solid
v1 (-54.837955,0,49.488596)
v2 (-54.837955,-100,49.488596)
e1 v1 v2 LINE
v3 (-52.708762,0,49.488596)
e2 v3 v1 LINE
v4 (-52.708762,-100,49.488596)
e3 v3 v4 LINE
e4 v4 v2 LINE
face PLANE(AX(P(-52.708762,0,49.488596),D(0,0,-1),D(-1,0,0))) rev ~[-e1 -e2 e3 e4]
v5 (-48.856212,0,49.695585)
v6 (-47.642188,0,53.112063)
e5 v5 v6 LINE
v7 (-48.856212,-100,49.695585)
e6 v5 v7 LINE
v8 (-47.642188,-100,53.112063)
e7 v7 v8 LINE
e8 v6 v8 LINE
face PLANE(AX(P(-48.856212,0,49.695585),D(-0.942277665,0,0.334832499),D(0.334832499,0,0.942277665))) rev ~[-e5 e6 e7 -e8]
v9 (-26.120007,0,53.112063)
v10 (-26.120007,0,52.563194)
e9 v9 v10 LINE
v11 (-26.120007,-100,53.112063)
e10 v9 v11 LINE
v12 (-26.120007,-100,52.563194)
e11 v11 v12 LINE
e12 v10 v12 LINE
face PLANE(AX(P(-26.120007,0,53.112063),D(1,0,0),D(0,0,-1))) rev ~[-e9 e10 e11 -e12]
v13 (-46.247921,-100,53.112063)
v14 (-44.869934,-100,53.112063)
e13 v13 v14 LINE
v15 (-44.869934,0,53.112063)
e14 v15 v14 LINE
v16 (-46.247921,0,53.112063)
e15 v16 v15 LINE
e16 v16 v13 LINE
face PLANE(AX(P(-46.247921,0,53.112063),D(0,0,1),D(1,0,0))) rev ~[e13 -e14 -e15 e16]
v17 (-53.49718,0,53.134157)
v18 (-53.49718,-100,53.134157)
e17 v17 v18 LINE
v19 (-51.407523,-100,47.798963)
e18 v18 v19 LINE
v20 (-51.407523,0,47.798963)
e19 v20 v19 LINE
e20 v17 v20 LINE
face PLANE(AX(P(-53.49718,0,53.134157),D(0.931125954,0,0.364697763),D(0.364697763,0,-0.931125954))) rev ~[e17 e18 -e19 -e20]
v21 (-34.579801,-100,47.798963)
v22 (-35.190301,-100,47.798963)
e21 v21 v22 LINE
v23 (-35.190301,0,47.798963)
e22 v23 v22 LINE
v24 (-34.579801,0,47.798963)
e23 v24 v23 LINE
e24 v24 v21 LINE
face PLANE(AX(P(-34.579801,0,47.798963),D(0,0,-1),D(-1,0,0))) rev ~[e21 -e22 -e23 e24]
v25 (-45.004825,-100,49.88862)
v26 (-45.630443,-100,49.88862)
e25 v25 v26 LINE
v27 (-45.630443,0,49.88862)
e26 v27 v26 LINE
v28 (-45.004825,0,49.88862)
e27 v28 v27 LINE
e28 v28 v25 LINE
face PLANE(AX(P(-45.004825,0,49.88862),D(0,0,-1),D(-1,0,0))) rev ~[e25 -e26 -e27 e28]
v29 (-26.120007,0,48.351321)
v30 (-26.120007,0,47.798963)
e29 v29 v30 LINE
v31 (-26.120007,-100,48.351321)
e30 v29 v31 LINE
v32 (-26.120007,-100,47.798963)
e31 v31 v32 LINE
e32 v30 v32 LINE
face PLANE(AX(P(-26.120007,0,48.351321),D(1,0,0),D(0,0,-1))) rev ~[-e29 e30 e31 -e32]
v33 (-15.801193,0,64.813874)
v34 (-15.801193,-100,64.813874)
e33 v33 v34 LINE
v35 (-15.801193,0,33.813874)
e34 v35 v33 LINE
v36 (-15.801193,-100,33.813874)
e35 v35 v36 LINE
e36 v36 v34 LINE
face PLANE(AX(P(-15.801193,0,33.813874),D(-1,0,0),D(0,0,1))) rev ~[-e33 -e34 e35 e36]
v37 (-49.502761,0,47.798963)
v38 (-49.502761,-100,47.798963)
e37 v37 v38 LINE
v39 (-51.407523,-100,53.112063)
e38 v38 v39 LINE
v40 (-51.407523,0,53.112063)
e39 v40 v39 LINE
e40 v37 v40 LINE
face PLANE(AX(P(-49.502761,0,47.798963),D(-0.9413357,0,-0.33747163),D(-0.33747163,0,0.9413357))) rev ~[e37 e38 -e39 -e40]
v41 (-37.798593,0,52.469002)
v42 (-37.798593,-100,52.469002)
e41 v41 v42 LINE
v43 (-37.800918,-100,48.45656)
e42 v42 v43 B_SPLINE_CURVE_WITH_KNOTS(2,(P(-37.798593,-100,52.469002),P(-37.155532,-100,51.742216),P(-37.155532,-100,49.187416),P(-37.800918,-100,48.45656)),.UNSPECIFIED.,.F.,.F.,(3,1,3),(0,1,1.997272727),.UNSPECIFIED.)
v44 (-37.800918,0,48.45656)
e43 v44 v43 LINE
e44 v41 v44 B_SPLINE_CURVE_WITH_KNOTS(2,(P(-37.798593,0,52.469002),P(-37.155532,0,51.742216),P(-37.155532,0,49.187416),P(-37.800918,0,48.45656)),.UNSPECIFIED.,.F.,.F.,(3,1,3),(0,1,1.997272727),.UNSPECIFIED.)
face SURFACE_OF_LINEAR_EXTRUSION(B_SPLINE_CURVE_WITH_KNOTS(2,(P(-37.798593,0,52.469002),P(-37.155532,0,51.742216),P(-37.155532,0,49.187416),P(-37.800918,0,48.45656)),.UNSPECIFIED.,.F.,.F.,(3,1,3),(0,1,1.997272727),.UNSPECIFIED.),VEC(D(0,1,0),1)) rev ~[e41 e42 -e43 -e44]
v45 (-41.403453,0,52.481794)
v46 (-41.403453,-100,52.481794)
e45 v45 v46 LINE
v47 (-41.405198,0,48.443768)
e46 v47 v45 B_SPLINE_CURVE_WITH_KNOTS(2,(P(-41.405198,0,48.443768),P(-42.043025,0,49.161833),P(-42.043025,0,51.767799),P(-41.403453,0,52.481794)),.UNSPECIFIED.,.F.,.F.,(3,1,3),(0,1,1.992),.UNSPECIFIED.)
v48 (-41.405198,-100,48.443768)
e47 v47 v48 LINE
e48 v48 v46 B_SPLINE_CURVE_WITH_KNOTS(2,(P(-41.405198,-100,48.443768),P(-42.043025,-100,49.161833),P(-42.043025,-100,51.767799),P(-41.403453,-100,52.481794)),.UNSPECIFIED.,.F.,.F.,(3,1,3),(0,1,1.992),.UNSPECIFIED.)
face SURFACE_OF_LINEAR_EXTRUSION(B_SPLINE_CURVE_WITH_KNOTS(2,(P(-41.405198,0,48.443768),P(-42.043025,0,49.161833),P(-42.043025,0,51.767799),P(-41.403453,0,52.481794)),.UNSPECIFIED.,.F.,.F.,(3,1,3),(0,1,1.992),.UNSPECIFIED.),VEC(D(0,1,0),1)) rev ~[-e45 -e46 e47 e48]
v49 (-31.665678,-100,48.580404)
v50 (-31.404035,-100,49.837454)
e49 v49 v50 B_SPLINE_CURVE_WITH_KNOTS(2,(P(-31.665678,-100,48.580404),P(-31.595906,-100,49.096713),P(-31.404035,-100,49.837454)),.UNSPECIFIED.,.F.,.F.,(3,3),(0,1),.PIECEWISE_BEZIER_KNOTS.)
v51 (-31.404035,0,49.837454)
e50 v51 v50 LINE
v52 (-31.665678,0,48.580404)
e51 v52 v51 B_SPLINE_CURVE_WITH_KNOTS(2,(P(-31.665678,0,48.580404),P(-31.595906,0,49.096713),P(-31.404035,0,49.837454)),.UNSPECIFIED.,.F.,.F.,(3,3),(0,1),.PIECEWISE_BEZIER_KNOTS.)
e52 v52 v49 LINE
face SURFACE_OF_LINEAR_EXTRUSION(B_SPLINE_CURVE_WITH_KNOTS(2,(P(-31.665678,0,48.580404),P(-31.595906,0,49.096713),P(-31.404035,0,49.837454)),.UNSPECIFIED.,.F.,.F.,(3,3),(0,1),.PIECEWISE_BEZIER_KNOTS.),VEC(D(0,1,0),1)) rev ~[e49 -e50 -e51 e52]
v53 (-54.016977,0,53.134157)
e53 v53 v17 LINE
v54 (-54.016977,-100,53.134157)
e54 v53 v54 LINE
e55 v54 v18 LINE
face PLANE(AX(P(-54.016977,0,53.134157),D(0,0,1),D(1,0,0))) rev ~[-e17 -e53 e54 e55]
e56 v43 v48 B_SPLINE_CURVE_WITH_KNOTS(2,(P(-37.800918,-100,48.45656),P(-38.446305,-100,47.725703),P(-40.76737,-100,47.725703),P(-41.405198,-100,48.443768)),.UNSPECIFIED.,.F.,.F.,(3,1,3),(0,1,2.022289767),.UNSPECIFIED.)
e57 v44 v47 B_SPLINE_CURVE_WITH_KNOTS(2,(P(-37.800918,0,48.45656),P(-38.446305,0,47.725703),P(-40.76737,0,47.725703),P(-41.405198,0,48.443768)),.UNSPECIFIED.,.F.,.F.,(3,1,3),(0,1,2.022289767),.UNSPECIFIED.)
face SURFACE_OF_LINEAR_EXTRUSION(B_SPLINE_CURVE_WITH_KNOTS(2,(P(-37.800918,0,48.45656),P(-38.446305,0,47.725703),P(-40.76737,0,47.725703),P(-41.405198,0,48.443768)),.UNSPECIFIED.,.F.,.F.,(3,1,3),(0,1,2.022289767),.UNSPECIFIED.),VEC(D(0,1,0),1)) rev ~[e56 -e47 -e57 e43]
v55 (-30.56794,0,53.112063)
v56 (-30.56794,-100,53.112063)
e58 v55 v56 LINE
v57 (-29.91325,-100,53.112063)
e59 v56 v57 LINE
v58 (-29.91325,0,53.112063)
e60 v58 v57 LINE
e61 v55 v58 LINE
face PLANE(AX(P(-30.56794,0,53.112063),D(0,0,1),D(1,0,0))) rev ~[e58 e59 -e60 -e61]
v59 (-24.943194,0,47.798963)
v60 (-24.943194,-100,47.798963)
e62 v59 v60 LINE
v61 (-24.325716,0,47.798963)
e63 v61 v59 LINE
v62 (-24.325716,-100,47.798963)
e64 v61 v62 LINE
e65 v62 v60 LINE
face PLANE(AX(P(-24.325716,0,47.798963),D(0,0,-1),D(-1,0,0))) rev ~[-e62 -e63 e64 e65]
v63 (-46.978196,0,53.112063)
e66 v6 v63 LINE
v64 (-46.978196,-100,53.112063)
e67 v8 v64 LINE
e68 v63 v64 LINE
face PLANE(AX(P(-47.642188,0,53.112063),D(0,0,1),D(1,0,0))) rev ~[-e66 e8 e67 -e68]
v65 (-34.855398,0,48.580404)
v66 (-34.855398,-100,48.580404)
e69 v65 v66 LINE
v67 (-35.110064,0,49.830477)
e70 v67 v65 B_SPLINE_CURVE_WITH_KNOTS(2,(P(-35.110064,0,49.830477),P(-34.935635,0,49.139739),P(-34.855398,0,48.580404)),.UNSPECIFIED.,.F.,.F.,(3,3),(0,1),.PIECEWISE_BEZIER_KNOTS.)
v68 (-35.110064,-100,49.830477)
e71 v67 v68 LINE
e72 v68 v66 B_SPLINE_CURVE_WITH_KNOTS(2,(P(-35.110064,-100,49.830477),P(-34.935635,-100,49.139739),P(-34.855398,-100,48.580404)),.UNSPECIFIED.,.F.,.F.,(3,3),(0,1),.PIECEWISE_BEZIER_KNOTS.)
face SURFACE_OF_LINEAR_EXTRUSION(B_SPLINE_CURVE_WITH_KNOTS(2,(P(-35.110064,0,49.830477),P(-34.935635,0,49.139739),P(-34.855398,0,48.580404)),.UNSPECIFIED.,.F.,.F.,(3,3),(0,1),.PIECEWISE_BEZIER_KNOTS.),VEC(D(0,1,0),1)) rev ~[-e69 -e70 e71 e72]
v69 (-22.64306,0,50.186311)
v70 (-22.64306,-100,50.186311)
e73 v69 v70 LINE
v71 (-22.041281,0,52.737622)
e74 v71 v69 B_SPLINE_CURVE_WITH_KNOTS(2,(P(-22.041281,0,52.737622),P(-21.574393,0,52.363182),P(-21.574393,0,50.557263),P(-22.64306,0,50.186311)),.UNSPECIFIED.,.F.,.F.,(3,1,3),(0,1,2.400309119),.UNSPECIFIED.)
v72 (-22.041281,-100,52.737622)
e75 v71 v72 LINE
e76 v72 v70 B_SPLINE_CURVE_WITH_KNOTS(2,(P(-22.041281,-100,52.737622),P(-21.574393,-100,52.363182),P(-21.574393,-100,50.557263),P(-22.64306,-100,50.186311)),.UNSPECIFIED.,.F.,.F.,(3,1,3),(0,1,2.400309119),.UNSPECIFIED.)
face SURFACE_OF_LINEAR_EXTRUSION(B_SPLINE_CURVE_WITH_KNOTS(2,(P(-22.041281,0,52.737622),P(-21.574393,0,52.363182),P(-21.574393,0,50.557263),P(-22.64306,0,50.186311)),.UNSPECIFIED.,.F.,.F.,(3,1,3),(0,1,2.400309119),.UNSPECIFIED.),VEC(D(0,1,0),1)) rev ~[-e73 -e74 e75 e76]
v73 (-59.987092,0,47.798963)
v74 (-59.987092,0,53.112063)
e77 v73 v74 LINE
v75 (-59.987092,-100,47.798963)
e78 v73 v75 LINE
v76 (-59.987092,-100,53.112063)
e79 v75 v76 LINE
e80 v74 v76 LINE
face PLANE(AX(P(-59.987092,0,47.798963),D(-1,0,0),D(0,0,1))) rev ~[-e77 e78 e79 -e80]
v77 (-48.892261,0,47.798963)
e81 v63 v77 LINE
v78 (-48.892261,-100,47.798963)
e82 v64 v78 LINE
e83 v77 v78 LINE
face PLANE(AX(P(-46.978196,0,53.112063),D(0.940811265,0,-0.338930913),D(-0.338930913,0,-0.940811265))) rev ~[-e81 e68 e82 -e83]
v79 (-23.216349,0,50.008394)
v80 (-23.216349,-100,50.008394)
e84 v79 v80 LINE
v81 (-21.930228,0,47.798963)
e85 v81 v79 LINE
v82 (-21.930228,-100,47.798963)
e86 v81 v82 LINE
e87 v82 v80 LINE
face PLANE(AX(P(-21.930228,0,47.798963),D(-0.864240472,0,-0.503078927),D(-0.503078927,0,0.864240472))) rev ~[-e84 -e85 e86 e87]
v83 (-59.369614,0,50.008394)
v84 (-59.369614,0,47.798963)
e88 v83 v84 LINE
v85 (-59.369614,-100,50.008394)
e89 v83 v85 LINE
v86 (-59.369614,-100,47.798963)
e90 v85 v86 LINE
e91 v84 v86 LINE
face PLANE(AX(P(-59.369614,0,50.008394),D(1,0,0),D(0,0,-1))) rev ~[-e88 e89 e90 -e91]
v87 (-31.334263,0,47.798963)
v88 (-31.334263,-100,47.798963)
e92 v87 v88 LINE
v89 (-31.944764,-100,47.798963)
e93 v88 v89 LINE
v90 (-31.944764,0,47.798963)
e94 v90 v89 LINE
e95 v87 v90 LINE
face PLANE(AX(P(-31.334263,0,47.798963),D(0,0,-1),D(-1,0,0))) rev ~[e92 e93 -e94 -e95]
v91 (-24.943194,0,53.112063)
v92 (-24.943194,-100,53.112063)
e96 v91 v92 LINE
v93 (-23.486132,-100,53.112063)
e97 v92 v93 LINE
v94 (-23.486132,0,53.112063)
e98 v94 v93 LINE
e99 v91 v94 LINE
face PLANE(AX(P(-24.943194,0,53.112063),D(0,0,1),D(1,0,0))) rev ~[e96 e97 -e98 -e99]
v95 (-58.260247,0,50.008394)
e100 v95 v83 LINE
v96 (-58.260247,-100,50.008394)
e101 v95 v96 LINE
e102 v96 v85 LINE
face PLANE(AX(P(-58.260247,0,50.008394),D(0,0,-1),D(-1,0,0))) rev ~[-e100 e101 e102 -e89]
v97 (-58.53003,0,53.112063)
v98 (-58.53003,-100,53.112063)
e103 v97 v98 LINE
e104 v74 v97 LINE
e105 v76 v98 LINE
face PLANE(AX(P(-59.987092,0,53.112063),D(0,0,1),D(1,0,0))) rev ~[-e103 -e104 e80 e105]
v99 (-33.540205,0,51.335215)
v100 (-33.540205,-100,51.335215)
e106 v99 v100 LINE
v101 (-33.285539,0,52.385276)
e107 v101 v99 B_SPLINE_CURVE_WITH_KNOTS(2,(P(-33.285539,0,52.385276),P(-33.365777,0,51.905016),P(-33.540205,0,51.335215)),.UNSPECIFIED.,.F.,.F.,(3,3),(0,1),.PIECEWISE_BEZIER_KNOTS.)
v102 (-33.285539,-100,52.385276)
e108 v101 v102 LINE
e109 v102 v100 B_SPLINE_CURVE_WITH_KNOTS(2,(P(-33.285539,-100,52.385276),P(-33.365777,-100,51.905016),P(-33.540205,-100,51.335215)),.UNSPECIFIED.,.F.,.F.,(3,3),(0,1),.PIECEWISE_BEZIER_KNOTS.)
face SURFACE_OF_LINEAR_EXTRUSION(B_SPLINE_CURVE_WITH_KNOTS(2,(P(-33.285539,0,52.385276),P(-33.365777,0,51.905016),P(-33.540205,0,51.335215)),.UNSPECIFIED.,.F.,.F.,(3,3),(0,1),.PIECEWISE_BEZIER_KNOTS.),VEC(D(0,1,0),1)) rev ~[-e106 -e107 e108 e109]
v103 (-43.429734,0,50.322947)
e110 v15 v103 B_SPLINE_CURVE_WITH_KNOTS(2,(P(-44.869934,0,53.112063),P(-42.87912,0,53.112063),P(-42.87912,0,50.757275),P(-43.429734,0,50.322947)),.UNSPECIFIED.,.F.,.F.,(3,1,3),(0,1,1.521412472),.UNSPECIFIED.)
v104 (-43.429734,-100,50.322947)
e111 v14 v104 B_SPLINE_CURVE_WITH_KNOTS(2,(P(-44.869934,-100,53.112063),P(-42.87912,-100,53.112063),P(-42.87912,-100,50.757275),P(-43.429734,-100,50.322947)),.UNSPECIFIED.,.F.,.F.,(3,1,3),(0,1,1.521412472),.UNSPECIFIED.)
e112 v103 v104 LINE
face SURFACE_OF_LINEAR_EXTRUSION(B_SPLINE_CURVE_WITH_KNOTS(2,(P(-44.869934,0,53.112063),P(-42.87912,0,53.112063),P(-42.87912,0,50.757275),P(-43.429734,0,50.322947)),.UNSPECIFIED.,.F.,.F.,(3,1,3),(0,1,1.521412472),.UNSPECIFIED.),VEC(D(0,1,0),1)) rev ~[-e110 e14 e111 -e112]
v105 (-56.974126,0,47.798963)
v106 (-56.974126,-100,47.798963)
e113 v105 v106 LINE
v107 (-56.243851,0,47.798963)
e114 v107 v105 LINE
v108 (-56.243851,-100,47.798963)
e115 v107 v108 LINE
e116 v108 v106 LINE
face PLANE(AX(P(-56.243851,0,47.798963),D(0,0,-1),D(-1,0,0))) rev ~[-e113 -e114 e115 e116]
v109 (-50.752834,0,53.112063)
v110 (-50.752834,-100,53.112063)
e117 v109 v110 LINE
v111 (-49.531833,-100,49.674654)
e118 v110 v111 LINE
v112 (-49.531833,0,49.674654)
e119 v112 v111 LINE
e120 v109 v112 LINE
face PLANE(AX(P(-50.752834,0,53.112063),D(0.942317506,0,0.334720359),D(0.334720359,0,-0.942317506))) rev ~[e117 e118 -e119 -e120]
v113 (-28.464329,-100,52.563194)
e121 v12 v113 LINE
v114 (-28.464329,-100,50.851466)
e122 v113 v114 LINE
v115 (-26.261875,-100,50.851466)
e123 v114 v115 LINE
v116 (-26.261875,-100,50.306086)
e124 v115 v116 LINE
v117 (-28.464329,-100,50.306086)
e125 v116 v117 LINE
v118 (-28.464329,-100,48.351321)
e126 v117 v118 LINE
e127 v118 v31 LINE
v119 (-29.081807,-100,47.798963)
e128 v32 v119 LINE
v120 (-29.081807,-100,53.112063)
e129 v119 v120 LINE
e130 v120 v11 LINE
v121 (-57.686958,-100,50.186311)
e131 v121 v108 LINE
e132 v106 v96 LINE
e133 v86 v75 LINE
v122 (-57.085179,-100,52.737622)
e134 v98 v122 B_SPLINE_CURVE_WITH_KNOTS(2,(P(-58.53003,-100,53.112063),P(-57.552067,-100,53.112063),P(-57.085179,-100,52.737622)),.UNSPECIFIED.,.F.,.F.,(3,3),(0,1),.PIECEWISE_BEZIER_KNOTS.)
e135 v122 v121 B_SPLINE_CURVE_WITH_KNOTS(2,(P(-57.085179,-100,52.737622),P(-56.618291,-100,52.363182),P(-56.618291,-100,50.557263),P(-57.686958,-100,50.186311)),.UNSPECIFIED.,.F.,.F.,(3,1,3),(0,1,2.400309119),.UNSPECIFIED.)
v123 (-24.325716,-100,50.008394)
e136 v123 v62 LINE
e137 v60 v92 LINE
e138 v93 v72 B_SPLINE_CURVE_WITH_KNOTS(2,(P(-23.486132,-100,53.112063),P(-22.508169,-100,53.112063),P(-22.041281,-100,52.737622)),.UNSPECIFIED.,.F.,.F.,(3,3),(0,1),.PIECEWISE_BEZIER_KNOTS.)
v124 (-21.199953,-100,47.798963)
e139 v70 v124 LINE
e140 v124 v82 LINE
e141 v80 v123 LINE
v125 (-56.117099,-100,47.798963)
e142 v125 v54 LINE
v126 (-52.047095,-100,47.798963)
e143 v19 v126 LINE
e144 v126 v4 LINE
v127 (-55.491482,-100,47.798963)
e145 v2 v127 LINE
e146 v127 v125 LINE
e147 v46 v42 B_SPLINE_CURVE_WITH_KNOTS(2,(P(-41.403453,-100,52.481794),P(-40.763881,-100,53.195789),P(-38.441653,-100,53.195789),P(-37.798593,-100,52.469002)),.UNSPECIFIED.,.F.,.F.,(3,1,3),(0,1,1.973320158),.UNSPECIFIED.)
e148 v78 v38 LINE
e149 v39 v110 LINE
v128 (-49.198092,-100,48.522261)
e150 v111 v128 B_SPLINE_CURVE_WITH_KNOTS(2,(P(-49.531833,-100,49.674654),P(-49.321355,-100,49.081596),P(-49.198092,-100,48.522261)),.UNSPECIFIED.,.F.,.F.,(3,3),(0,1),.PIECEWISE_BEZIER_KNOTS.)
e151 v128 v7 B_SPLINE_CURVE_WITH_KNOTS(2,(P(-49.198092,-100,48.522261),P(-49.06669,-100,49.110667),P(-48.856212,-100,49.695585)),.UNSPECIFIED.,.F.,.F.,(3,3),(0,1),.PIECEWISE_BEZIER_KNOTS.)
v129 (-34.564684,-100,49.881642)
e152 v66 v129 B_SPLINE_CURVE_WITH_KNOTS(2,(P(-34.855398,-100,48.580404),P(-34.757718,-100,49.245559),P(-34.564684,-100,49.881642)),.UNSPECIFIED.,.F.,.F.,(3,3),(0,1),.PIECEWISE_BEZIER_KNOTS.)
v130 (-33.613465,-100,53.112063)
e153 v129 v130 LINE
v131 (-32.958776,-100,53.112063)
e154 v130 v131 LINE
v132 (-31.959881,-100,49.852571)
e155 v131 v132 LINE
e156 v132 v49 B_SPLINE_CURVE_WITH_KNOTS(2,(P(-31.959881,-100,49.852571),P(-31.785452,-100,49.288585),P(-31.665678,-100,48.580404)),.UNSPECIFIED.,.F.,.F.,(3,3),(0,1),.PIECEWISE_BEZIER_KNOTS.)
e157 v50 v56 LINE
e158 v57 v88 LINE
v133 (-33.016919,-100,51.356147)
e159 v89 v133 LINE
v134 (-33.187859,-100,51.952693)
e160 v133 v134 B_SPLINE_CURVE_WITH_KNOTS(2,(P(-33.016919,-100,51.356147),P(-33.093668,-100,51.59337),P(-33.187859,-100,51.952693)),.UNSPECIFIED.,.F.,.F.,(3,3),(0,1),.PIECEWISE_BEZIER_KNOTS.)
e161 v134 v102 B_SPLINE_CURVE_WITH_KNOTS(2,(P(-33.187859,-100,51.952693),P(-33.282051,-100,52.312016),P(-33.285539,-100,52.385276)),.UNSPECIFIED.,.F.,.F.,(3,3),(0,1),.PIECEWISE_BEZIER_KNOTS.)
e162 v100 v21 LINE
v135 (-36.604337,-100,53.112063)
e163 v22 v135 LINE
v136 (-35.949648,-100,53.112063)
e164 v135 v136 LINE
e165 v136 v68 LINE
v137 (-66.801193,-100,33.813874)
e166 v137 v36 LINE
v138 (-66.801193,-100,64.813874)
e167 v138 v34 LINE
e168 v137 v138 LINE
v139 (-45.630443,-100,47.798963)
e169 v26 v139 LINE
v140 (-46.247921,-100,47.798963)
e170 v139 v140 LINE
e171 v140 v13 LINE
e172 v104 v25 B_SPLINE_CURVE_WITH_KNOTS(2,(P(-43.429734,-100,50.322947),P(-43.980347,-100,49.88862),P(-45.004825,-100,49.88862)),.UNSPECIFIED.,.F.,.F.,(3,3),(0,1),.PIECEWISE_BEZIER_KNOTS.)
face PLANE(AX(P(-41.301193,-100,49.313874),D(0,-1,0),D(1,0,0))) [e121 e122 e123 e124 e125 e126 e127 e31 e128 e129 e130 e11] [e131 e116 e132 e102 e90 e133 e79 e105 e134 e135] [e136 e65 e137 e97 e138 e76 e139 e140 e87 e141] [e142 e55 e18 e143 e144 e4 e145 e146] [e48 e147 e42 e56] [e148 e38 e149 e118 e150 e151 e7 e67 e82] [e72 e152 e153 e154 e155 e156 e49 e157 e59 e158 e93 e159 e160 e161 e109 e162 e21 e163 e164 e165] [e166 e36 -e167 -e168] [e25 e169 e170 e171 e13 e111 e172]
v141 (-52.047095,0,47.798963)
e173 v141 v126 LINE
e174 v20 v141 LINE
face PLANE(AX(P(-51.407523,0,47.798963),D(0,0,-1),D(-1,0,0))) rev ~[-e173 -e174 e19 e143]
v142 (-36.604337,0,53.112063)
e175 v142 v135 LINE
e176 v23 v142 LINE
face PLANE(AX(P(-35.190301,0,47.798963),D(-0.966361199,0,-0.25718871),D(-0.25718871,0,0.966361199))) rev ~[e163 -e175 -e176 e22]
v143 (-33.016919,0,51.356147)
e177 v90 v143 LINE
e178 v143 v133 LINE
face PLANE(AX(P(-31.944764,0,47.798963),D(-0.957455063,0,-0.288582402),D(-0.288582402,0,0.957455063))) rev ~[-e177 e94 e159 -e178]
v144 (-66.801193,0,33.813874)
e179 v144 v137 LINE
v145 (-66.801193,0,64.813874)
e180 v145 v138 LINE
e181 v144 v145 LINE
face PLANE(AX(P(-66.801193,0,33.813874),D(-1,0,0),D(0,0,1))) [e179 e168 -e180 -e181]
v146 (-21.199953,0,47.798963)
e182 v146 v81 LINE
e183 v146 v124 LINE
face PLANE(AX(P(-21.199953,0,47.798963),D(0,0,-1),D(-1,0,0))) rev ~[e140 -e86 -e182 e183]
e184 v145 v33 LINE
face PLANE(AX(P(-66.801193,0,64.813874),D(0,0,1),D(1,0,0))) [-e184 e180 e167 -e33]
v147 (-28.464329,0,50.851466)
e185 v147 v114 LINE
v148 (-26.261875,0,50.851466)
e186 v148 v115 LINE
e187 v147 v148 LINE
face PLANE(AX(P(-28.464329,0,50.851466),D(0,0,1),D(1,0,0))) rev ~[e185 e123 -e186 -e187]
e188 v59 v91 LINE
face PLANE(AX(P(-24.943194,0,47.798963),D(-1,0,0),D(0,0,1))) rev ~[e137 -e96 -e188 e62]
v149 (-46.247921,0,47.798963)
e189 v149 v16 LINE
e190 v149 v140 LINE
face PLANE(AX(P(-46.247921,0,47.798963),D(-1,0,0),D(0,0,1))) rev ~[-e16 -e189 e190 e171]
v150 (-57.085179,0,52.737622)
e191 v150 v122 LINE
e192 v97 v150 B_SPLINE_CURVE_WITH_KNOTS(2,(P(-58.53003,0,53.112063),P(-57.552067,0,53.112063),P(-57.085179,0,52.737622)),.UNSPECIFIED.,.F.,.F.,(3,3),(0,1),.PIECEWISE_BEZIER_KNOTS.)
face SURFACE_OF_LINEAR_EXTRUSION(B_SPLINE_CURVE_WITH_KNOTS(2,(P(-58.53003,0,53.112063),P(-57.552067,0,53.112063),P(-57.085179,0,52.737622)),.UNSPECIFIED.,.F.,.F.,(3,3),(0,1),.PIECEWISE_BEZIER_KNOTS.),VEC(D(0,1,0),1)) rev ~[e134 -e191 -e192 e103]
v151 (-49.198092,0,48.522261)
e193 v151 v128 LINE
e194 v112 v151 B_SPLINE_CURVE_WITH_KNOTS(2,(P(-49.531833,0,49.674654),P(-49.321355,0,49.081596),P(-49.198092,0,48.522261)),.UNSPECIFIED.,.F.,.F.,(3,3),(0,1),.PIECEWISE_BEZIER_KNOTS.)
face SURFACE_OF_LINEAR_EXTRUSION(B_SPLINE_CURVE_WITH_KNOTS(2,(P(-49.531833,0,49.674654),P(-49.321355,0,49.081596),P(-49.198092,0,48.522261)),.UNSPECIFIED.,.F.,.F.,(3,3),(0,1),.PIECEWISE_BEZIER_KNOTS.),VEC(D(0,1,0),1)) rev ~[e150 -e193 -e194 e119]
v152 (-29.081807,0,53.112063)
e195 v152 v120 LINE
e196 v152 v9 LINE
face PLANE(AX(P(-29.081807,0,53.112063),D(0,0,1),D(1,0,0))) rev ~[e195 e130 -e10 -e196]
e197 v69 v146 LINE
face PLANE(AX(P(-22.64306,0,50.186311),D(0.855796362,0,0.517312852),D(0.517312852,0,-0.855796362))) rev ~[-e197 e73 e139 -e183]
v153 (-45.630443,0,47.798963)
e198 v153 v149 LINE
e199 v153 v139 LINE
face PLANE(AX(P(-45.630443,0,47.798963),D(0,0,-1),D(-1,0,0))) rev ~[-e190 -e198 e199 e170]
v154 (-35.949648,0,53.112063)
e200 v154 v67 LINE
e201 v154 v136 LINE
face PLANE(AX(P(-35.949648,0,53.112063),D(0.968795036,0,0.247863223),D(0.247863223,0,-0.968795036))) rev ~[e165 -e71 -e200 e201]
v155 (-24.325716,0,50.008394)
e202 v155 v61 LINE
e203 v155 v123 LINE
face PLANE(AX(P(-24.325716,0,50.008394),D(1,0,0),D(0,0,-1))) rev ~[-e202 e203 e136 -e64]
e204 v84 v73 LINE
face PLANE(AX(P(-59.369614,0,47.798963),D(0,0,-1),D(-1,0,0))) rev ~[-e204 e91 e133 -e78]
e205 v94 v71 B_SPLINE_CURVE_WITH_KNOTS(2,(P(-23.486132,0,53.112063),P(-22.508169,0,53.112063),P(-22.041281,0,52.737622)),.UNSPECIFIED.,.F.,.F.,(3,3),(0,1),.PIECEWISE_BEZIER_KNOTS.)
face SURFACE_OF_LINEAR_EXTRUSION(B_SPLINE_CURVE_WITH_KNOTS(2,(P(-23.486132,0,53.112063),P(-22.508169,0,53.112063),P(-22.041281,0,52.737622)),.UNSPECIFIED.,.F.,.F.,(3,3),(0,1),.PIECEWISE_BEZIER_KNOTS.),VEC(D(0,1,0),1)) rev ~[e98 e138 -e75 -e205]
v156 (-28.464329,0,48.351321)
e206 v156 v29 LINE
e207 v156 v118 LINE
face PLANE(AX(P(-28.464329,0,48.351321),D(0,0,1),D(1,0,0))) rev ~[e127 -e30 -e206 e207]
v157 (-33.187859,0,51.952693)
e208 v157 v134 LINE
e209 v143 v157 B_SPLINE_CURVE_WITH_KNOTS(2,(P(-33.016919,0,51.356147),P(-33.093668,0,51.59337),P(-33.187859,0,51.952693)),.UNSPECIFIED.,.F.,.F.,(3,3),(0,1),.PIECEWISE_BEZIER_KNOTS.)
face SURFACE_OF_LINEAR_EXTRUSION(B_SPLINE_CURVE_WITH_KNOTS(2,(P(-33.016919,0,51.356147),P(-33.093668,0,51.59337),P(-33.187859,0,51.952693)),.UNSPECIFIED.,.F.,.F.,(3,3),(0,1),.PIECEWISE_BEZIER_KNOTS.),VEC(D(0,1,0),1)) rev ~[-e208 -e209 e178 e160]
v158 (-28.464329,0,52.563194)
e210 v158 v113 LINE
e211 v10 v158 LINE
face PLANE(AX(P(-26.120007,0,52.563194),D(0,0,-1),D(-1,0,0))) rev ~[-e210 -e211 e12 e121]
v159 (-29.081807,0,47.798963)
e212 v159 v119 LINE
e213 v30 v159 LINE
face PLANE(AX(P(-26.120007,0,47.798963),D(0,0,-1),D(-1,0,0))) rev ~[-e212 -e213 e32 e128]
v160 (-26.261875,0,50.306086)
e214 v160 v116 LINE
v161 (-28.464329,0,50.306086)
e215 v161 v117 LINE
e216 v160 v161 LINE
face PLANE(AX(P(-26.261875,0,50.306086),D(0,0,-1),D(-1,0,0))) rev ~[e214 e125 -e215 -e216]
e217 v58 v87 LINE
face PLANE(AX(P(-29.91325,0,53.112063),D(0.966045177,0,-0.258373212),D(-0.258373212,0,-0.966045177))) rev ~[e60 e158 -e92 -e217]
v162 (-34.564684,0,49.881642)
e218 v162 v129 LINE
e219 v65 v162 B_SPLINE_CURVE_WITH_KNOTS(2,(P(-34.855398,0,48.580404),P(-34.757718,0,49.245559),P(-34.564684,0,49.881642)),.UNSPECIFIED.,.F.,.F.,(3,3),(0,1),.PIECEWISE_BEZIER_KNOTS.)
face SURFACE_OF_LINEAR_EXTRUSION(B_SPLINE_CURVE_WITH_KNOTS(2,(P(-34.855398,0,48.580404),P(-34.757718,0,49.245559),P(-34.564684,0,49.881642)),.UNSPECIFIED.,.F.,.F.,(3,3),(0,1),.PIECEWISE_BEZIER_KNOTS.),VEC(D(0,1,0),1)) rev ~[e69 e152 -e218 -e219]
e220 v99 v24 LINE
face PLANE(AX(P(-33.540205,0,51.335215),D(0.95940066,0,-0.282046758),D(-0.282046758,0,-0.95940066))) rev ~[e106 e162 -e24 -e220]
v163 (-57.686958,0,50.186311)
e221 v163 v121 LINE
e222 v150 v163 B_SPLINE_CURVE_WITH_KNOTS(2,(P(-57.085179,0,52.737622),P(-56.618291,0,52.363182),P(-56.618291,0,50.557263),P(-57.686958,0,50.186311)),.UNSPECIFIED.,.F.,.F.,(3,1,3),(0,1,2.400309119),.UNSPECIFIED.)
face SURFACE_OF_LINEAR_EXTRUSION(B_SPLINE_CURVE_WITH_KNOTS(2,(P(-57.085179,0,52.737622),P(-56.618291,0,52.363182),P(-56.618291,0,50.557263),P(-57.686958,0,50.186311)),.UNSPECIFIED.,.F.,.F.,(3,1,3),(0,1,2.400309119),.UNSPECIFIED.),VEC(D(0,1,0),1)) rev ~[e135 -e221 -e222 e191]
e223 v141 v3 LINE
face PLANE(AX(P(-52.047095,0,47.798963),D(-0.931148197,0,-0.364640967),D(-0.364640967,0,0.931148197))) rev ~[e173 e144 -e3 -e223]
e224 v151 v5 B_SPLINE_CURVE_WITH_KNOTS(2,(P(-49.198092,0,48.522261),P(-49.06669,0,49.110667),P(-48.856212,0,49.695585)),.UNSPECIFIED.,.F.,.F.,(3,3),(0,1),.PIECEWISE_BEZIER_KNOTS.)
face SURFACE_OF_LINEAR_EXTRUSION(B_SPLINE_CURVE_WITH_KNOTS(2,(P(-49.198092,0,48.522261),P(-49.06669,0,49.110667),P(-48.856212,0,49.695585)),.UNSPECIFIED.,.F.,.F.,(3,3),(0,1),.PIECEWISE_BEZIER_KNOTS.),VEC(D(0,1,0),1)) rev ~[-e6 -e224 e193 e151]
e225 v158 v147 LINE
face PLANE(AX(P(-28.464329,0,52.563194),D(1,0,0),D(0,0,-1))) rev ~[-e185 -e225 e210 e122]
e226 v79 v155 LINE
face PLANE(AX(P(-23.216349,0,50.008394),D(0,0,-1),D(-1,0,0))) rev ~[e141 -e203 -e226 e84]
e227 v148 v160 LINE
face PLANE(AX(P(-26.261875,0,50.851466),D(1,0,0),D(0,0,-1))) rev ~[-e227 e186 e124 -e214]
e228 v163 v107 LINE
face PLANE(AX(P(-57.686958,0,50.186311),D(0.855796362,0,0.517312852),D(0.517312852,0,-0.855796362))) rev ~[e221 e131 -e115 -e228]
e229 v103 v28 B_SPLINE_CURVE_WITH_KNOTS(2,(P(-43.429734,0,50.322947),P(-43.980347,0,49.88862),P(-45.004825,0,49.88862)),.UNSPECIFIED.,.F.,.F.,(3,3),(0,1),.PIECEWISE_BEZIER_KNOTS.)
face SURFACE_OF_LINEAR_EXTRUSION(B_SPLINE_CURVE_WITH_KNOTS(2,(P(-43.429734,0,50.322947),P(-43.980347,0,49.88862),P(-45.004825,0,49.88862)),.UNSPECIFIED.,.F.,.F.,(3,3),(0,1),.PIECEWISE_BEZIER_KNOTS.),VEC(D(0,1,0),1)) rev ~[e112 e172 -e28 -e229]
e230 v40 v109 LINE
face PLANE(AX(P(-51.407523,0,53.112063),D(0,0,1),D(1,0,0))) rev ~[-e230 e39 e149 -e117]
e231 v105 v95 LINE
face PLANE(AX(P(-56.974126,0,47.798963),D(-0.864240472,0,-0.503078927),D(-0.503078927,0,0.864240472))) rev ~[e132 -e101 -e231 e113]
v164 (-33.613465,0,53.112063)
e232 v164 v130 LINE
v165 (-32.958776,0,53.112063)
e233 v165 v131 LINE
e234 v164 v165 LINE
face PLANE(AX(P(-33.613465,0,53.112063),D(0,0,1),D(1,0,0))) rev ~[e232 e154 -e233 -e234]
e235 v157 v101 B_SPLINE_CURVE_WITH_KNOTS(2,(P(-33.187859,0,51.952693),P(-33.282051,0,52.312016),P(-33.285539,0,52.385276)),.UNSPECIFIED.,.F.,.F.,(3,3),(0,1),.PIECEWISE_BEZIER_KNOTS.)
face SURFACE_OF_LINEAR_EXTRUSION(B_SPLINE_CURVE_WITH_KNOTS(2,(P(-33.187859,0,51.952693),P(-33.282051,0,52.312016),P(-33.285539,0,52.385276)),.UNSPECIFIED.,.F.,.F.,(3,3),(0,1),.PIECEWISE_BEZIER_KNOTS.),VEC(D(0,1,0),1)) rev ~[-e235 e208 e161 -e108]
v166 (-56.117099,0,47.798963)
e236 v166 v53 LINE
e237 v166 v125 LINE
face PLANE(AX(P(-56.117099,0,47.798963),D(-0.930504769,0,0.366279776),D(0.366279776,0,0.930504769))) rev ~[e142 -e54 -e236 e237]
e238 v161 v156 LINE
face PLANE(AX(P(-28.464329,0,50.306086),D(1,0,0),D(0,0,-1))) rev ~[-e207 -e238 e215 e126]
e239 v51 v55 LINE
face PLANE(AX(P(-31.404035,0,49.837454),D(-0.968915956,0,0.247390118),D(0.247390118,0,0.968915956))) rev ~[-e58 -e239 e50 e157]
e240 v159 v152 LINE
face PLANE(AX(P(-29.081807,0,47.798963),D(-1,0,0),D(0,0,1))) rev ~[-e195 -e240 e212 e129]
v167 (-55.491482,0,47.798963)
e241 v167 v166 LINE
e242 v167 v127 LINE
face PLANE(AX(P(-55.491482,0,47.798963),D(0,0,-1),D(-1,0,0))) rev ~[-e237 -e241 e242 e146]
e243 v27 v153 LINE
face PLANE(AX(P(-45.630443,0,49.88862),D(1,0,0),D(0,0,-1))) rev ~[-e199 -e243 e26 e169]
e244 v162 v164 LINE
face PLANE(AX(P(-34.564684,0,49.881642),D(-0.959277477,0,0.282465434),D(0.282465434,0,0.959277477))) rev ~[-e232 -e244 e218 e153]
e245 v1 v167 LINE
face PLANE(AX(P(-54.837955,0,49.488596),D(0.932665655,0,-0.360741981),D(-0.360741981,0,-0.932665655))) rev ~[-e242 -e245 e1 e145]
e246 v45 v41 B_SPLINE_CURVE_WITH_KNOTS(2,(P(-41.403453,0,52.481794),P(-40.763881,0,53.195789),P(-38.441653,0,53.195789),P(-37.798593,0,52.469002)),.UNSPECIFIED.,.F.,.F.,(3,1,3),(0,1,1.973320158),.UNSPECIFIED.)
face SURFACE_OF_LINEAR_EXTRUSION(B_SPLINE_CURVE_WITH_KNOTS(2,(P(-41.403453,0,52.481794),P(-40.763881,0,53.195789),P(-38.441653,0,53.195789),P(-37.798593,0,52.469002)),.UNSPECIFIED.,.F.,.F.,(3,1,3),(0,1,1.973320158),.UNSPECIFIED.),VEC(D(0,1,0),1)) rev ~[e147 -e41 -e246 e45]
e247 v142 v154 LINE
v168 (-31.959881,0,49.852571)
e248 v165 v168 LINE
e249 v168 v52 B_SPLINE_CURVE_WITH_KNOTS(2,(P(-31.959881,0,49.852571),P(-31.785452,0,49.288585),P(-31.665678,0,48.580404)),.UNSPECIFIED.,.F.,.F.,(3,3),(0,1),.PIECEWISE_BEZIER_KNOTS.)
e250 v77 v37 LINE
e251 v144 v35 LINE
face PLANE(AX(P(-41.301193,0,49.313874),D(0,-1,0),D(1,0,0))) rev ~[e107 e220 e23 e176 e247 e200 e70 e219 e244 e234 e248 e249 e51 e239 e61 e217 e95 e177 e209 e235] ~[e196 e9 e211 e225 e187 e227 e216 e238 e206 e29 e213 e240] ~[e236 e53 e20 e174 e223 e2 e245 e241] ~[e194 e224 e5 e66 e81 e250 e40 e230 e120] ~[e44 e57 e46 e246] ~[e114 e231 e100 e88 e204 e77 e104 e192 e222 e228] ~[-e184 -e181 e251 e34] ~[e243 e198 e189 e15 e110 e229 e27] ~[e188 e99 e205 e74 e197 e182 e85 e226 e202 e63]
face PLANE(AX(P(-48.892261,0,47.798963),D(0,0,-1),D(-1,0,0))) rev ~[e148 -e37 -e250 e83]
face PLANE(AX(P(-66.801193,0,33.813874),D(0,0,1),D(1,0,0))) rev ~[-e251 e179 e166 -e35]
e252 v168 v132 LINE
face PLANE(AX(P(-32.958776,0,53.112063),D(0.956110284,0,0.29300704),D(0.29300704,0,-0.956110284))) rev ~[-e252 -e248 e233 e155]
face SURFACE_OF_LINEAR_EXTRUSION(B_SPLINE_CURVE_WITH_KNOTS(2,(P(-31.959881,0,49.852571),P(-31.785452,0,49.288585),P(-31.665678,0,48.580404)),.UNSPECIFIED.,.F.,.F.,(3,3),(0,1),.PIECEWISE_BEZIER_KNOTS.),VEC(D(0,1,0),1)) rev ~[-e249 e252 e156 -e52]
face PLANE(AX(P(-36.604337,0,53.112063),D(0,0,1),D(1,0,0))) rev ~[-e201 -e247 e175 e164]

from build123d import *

# Parameters (mm, degrees)
F0_W     = 51
F0_H     = 31
F1_DEPTH = 100


with BuildPart() as f1:
    # F0 (on Front) → F1 (new body)
    with BuildSketch(Plane.XZ):
        with Locations((-41.3011932845, 49.3138737511)):
            Rectangle(F0_W, F0_H)
        with BuildLine():
            Line((-58.2602472687, 50.0083940445), (-59.3696140923, 50.0083940445))
            Line((-59.3696140923, 50.0083940445), (-59.3696140923, 47.7989632636))
            Line((-59.3696140923, 47.7989632636), (-59.9870918526, 47.7989632636))
            Line((-59.9870918526, 47.7989632636), (-59.9870918526, 53.1120628624))
            Line((-59.9870918526, 53.1120628624), (-58.5300303956, 53.1120628624))
            add(Edge.make_bspline(
                [(-58.5300303956, 53.1120628624), (-57.5520665605, 53.1120628624), (-57.0851789507, 52.737622488)],
                knots=[0, 0, 0, 1, 1, 1], degree=2))
            add(Edge.make_bspline(
                [(-57.0851789507, 52.737622488), (-56.618291341, 52.3631821136), (-56.618291341, 51.6108127898)],
                knots=[0, 0, 0, 1, 1, 1], degree=2))
            add(Edge.make_bspline(
                [(-56.618291341, 51.6108127898), (-56.618291341, 50.5572631648), (-57.6869581239, 50.1863113653)],
                knots=[0, 0, 0, 1, 1, 1], degree=2))
            Line((-57.6869581239, 50.1863113653), (-56.2438509665, 47.7989632636))
            Line((-56.2438509665, 47.7989632636), (-56.9741259825, 47.7989632636))
            Line((-56.9741259825, 47.7989632636), (-58.2602472687, 50.0083940445))
        make_face(mode=Mode.SUBTRACT)
        Polygon((-51.4075232731, 47.7989632636), (-52.0470953412, 47.7989632636), (-52.7087617172, 49.4885963818), (-54.8379552749, 49.4885963818), (-55.4914816427, 47.7989632636), (-56.1170994112, 47.7989632636), (-54.0169773111, 53.1341571703), (-53.4971796484, 53.1341571703), align=None, mode=Mode.SUBTRACT)
        with BuildLine():
            Line((-48.8562121503, 49.6955851603), (-47.6421880792, 53.1120628624))
            Line((-47.6421880792, 53.1120628624), (-46.9781959866, 53.1120628624))
            Line((-46.9781959866, 53.1120628624), (-48.8922607578, 47.7989632636))
            Line((-48.8922607578, 47.7989632636), (-49.5027613683, 47.7989632636))
            Line((-49.5027613683, 47.7989632636), (-51.4075232731, 53.1120628624))
            Line((-51.4075232731, 53.1120628624), (-50.752834047, 53.1120628624))
            Line((-50.752834047, 53.1120628624), (-49.531832826, 49.6746537107))
            add(Edge.make_bspline(
                [(-49.531832826, 49.6746537107), (-49.3213554726, 49.0815959748), (-49.1980924922, 48.5222611298)],
                knots=[0, 0, 0, 1, 1, 1], degree=2))
            add(Edge.make_bspline(
                [(-49.1980924922, 48.5222611298), (-49.0666895037, 49.1106674325), (-48.8562121503, 49.6955851603)],
                knots=[0, 0, 0, 1, 1, 1], degree=2))
        make_face(mode=Mode.SUBTRACT)
        with BuildLine():
            add(Edge.make_bspline(
                [(-44.8699338783, 53.1120628624), (-42.879120459, 53.1120628624), (-42.879120459, 51.5642984575)],
                knots=[0, 0, 0, 1, 1, 1], degree=2))
            add(Edge.make_bspline(
                [(-42.879120459, 51.5642984575), (-42.879120459, 50.7572747934), (-43.4297338667, 50.3229472162)],
                knots=[0, 0, 0, 1, 1, 1], degree=2))
            add(Edge.make_bspline(
                [(-43.4297338667, 50.3229472162), (-43.9803472745, 49.888619639), (-45.0048254418, 49.888619639)],
                knots=[0, 0, 0, 1, 1, 1], degree=2))
            Line((-45.0048254418, 49.888619639), (-45.6304432103, 49.888619639))
            Line((-45.6304432103, 49.888619639), (-45.6304432103, 47.7989632636))
            Line((-45.6304432103, 47.7989632636), (-46.2479209706, 47.7989632636))
            Line((-46.2479209706, 47.7989632636), (-46.2479209706, 53.1120628624))
            Line((-46.2479209706, 53.1120628624), (-44.8699338783, 53.1120628624))
        make_face(mode=Mode.SUBTRACT)
        with BuildLine():
            add(Edge.make_bspline(
                [(-37.7985925213, 52.4690022194), (-37.1555318782, 51.7422157783), (-37.1555318782, 50.463071642)],
                knots=[0, 0, 0, 1, 1, 1], degree=2))
            add(Edge.make_bspline(
                [(-37.1555318782, 50.463071642), (-37.1555318782, 49.1874160807), (-37.8009182379, 48.4565596355)],
                knots=[0, 0, 0, 1, 1, 1], degree=2))
            add(Edge.make_bspline(
                [(-37.8009182379, 48.4565596355), (-38.4463045976, 47.7257031904), (-39.5940457453, 47.7257031904)],
                knots=[0, 0, 0, 1, 1, 1], degree=2))
            add(Edge.make_bspline(
                [(-39.5940457453, 47.7257031904), (-40.7673697758, 47.7257031904), (-41.4051975565, 48.4437681942)],
                knots=[0, 0, 0, 1, 1, 1], degree=2))
            add(Edge.make_bspline(
                [(-41.4051975565, 48.4437681942), (-42.0430253371, 49.1618331979), (-42.0430253371, 50.4700487919)],
                knots=[0, 0, 0, 1, 1, 1], degree=2))
            add(Edge.make_bspline(
                [(-42.0430253371, 50.4700487919), (-42.0430253371, 51.767798661), (-41.403453269, 52.4817936607)],
                knots=[0, 0, 0, 1, 1, 1], degree=2))
            add(Edge.make_bspline(
                [(-41.403453269, 52.4817936607), (-40.7638812009, 53.1957886605), (-39.5870685955, 53.1957886605)],
                knots=[0, 0, 0, 1, 1, 1], degree=2))
            add(Edge.make_bspline(
                [(-39.5870685955, 53.1957886605), (-38.4416531643, 53.1957886605), (-37.7985925213, 52.4690022194)],
                knots=[0, 0, 0, 1, 1, 1], degree=2))
        make_face(mode=Mode.SUBTRACT)
        with BuildLine():
            Line((-29.9132503502, 53.1120628624), (-31.3342631998, 47.7989632636))
            Line((-31.3342631998, 47.7989632636), (-31.9447638103, 47.7989632636))
            Line((-31.9447638103, 47.7989632636), (-33.0169191682, 51.3561468208))
            add(Edge.make_bspline(
                [(-33.0169191682, 51.3561468208), (-33.0936678164, 51.5933699152), (-33.1878593391, 51.9526931316)],
                knots=[0, 0, 0, 1, 1, 1], degree=2))
            add(Edge.make_bspline(
                [(-33.1878593391, 51.9526931316), (-33.2820508619, 52.3120163481), (-33.2855394368, 52.3852764214)],
                knots=[0, 0, 0, 1, 1, 1], degree=2))
            add(Edge.make_bspline(
                [(-33.2855394368, 52.3852764214), (-33.3657766599, 51.9050159411), (-33.5402054058, 51.3352153713)],
                knots=[0, 0, 0, 1, 1, 1], degree=2))
            Line((-33.5402054058, 51.3352153713), (-34.5798007311, 47.7989632636))
            Line((-34.5798007311, 47.7989632636), (-35.1903013416, 47.7989632636))
            Line((-35.1903013416, 47.7989632636), (-36.6043370413, 53.1120628624))
            Line((-36.6043370413, 53.1120628624), (-35.9496478152, 53.1120628624))
            Line((-35.9496478152, 53.1120628624), (-35.1100641185, 49.8304767237))
            add(Edge.make_bspline(
                [(-35.1100641185, 49.8304767237), (-34.9356353726, 49.1397388901), (-34.8553981495, 48.5804040451)],
                knots=[0, 0, 0, 1, 1, 1], degree=2))
            add(Edge.make_bspline(
                [(-34.8553981495, 48.5804040451), (-34.7577180518, 49.2455589959), (-34.5646835731, 49.8816424892)],
                knots=[0, 0, 0, 1, 1, 1], degree=2))
            Line((-34.5646835731, 49.8816424892), (-33.613465479, 53.1120628624))
            Line((-33.613465479, 53.1120628624), (-32.9587762529, 53.1120628624))
            Line((-32.9587762529, 53.1120628624), (-31.9598809683, 49.8525710315))
            add(Edge.make_bspline(
                [(-31.9598809683, 49.8525710315), (-31.7854522224, 49.2885847533), (-31.6656778169, 48.5804040451)],
                knots=[0, 0, 0, 1, 1, 1], degree=2))
            add(Edge.make_bspline(
                [(-31.6656778169, 48.5804040451), (-31.5959063186, 49.0967131328), (-31.4040346982, 49.8374538736)],
                knots=[0, 0, 0, 1, 1, 1], degree=2))
            Line((-31.4040346982, 49.8374538736), (-30.5679395763, 53.1120628624))
            Line((-30.5679395763, 53.1120628624), (-29.9132503502, 53.1120628624))
        make_face(mode=Mode.SUBTRACT)
        Polygon((-26.120006557, 48.3513209588), (-26.120006557, 47.7989632636), (-29.0818066616, 47.7989632636), (-29.0818066616, 53.1120628624), (-26.120006557, 53.1120628624), (-26.120006557, 52.5631937421), (-28.4643289013, 52.5631937421), (-28.4643289013, 50.8514663161), (-26.2618752703, 50.8514663161), (-26.2618752703, 50.3060857708), (-28.4643289013, 50.3060857708), (-28.4643289013, 48.3513209588), align=None, mode=Mode.SUBTRACT)
        with BuildLine():
            Line((-23.2163493676, 50.0083940445), (-24.3257161913, 50.0083940445))
            Line((-24.3257161913, 50.0083940445), (-24.3257161913, 47.7989632636))
            Line((-24.3257161913, 47.7989632636), (-24.9431939516, 47.7989632636))
            Line((-24.9431939516, 47.7989632636), (-24.9431939516, 53.1120628624))
            Line((-24.9431939516, 53.1120628624), (-23.4861324945, 53.1120628624))
            add(Edge.make_bspline(
                [(-23.4861324945, 53.1120628624), (-22.5081686594, 53.1120628624), (-22.0412810497, 52.737622488)],
                knots=[0, 0, 0, 1, 1, 1], degree=2))
            add(Edge.make_bspline(
                [(-22.0412810497, 52.737622488), (-21.5743934399, 52.3631821136), (-21.5743934399, 51.6108127898)],
                knots=[0, 0, 0, 1, 1, 1], degree=2))
            add(Edge.make_bspline(
                [(-21.5743934399, 51.6108127898), (-21.5743934399, 50.5572631648), (-22.6430602229, 50.1863113653)],
                knots=[0, 0, 0, 1, 1, 1], degree=2))
            Line((-22.6430602229, 50.1863113653), (-21.1999530655, 47.7989632636))
            Line((-21.1999530655, 47.7989632636), (-21.9302280815, 47.7989632636))
            Line((-21.9302280815, 47.7989632636), (-23.2163493676, 50.0083940445))
        make_face(mode=Mode.SUBTRACT)
    extrude(amount=F1_DEPTH)


solid = f1.part
